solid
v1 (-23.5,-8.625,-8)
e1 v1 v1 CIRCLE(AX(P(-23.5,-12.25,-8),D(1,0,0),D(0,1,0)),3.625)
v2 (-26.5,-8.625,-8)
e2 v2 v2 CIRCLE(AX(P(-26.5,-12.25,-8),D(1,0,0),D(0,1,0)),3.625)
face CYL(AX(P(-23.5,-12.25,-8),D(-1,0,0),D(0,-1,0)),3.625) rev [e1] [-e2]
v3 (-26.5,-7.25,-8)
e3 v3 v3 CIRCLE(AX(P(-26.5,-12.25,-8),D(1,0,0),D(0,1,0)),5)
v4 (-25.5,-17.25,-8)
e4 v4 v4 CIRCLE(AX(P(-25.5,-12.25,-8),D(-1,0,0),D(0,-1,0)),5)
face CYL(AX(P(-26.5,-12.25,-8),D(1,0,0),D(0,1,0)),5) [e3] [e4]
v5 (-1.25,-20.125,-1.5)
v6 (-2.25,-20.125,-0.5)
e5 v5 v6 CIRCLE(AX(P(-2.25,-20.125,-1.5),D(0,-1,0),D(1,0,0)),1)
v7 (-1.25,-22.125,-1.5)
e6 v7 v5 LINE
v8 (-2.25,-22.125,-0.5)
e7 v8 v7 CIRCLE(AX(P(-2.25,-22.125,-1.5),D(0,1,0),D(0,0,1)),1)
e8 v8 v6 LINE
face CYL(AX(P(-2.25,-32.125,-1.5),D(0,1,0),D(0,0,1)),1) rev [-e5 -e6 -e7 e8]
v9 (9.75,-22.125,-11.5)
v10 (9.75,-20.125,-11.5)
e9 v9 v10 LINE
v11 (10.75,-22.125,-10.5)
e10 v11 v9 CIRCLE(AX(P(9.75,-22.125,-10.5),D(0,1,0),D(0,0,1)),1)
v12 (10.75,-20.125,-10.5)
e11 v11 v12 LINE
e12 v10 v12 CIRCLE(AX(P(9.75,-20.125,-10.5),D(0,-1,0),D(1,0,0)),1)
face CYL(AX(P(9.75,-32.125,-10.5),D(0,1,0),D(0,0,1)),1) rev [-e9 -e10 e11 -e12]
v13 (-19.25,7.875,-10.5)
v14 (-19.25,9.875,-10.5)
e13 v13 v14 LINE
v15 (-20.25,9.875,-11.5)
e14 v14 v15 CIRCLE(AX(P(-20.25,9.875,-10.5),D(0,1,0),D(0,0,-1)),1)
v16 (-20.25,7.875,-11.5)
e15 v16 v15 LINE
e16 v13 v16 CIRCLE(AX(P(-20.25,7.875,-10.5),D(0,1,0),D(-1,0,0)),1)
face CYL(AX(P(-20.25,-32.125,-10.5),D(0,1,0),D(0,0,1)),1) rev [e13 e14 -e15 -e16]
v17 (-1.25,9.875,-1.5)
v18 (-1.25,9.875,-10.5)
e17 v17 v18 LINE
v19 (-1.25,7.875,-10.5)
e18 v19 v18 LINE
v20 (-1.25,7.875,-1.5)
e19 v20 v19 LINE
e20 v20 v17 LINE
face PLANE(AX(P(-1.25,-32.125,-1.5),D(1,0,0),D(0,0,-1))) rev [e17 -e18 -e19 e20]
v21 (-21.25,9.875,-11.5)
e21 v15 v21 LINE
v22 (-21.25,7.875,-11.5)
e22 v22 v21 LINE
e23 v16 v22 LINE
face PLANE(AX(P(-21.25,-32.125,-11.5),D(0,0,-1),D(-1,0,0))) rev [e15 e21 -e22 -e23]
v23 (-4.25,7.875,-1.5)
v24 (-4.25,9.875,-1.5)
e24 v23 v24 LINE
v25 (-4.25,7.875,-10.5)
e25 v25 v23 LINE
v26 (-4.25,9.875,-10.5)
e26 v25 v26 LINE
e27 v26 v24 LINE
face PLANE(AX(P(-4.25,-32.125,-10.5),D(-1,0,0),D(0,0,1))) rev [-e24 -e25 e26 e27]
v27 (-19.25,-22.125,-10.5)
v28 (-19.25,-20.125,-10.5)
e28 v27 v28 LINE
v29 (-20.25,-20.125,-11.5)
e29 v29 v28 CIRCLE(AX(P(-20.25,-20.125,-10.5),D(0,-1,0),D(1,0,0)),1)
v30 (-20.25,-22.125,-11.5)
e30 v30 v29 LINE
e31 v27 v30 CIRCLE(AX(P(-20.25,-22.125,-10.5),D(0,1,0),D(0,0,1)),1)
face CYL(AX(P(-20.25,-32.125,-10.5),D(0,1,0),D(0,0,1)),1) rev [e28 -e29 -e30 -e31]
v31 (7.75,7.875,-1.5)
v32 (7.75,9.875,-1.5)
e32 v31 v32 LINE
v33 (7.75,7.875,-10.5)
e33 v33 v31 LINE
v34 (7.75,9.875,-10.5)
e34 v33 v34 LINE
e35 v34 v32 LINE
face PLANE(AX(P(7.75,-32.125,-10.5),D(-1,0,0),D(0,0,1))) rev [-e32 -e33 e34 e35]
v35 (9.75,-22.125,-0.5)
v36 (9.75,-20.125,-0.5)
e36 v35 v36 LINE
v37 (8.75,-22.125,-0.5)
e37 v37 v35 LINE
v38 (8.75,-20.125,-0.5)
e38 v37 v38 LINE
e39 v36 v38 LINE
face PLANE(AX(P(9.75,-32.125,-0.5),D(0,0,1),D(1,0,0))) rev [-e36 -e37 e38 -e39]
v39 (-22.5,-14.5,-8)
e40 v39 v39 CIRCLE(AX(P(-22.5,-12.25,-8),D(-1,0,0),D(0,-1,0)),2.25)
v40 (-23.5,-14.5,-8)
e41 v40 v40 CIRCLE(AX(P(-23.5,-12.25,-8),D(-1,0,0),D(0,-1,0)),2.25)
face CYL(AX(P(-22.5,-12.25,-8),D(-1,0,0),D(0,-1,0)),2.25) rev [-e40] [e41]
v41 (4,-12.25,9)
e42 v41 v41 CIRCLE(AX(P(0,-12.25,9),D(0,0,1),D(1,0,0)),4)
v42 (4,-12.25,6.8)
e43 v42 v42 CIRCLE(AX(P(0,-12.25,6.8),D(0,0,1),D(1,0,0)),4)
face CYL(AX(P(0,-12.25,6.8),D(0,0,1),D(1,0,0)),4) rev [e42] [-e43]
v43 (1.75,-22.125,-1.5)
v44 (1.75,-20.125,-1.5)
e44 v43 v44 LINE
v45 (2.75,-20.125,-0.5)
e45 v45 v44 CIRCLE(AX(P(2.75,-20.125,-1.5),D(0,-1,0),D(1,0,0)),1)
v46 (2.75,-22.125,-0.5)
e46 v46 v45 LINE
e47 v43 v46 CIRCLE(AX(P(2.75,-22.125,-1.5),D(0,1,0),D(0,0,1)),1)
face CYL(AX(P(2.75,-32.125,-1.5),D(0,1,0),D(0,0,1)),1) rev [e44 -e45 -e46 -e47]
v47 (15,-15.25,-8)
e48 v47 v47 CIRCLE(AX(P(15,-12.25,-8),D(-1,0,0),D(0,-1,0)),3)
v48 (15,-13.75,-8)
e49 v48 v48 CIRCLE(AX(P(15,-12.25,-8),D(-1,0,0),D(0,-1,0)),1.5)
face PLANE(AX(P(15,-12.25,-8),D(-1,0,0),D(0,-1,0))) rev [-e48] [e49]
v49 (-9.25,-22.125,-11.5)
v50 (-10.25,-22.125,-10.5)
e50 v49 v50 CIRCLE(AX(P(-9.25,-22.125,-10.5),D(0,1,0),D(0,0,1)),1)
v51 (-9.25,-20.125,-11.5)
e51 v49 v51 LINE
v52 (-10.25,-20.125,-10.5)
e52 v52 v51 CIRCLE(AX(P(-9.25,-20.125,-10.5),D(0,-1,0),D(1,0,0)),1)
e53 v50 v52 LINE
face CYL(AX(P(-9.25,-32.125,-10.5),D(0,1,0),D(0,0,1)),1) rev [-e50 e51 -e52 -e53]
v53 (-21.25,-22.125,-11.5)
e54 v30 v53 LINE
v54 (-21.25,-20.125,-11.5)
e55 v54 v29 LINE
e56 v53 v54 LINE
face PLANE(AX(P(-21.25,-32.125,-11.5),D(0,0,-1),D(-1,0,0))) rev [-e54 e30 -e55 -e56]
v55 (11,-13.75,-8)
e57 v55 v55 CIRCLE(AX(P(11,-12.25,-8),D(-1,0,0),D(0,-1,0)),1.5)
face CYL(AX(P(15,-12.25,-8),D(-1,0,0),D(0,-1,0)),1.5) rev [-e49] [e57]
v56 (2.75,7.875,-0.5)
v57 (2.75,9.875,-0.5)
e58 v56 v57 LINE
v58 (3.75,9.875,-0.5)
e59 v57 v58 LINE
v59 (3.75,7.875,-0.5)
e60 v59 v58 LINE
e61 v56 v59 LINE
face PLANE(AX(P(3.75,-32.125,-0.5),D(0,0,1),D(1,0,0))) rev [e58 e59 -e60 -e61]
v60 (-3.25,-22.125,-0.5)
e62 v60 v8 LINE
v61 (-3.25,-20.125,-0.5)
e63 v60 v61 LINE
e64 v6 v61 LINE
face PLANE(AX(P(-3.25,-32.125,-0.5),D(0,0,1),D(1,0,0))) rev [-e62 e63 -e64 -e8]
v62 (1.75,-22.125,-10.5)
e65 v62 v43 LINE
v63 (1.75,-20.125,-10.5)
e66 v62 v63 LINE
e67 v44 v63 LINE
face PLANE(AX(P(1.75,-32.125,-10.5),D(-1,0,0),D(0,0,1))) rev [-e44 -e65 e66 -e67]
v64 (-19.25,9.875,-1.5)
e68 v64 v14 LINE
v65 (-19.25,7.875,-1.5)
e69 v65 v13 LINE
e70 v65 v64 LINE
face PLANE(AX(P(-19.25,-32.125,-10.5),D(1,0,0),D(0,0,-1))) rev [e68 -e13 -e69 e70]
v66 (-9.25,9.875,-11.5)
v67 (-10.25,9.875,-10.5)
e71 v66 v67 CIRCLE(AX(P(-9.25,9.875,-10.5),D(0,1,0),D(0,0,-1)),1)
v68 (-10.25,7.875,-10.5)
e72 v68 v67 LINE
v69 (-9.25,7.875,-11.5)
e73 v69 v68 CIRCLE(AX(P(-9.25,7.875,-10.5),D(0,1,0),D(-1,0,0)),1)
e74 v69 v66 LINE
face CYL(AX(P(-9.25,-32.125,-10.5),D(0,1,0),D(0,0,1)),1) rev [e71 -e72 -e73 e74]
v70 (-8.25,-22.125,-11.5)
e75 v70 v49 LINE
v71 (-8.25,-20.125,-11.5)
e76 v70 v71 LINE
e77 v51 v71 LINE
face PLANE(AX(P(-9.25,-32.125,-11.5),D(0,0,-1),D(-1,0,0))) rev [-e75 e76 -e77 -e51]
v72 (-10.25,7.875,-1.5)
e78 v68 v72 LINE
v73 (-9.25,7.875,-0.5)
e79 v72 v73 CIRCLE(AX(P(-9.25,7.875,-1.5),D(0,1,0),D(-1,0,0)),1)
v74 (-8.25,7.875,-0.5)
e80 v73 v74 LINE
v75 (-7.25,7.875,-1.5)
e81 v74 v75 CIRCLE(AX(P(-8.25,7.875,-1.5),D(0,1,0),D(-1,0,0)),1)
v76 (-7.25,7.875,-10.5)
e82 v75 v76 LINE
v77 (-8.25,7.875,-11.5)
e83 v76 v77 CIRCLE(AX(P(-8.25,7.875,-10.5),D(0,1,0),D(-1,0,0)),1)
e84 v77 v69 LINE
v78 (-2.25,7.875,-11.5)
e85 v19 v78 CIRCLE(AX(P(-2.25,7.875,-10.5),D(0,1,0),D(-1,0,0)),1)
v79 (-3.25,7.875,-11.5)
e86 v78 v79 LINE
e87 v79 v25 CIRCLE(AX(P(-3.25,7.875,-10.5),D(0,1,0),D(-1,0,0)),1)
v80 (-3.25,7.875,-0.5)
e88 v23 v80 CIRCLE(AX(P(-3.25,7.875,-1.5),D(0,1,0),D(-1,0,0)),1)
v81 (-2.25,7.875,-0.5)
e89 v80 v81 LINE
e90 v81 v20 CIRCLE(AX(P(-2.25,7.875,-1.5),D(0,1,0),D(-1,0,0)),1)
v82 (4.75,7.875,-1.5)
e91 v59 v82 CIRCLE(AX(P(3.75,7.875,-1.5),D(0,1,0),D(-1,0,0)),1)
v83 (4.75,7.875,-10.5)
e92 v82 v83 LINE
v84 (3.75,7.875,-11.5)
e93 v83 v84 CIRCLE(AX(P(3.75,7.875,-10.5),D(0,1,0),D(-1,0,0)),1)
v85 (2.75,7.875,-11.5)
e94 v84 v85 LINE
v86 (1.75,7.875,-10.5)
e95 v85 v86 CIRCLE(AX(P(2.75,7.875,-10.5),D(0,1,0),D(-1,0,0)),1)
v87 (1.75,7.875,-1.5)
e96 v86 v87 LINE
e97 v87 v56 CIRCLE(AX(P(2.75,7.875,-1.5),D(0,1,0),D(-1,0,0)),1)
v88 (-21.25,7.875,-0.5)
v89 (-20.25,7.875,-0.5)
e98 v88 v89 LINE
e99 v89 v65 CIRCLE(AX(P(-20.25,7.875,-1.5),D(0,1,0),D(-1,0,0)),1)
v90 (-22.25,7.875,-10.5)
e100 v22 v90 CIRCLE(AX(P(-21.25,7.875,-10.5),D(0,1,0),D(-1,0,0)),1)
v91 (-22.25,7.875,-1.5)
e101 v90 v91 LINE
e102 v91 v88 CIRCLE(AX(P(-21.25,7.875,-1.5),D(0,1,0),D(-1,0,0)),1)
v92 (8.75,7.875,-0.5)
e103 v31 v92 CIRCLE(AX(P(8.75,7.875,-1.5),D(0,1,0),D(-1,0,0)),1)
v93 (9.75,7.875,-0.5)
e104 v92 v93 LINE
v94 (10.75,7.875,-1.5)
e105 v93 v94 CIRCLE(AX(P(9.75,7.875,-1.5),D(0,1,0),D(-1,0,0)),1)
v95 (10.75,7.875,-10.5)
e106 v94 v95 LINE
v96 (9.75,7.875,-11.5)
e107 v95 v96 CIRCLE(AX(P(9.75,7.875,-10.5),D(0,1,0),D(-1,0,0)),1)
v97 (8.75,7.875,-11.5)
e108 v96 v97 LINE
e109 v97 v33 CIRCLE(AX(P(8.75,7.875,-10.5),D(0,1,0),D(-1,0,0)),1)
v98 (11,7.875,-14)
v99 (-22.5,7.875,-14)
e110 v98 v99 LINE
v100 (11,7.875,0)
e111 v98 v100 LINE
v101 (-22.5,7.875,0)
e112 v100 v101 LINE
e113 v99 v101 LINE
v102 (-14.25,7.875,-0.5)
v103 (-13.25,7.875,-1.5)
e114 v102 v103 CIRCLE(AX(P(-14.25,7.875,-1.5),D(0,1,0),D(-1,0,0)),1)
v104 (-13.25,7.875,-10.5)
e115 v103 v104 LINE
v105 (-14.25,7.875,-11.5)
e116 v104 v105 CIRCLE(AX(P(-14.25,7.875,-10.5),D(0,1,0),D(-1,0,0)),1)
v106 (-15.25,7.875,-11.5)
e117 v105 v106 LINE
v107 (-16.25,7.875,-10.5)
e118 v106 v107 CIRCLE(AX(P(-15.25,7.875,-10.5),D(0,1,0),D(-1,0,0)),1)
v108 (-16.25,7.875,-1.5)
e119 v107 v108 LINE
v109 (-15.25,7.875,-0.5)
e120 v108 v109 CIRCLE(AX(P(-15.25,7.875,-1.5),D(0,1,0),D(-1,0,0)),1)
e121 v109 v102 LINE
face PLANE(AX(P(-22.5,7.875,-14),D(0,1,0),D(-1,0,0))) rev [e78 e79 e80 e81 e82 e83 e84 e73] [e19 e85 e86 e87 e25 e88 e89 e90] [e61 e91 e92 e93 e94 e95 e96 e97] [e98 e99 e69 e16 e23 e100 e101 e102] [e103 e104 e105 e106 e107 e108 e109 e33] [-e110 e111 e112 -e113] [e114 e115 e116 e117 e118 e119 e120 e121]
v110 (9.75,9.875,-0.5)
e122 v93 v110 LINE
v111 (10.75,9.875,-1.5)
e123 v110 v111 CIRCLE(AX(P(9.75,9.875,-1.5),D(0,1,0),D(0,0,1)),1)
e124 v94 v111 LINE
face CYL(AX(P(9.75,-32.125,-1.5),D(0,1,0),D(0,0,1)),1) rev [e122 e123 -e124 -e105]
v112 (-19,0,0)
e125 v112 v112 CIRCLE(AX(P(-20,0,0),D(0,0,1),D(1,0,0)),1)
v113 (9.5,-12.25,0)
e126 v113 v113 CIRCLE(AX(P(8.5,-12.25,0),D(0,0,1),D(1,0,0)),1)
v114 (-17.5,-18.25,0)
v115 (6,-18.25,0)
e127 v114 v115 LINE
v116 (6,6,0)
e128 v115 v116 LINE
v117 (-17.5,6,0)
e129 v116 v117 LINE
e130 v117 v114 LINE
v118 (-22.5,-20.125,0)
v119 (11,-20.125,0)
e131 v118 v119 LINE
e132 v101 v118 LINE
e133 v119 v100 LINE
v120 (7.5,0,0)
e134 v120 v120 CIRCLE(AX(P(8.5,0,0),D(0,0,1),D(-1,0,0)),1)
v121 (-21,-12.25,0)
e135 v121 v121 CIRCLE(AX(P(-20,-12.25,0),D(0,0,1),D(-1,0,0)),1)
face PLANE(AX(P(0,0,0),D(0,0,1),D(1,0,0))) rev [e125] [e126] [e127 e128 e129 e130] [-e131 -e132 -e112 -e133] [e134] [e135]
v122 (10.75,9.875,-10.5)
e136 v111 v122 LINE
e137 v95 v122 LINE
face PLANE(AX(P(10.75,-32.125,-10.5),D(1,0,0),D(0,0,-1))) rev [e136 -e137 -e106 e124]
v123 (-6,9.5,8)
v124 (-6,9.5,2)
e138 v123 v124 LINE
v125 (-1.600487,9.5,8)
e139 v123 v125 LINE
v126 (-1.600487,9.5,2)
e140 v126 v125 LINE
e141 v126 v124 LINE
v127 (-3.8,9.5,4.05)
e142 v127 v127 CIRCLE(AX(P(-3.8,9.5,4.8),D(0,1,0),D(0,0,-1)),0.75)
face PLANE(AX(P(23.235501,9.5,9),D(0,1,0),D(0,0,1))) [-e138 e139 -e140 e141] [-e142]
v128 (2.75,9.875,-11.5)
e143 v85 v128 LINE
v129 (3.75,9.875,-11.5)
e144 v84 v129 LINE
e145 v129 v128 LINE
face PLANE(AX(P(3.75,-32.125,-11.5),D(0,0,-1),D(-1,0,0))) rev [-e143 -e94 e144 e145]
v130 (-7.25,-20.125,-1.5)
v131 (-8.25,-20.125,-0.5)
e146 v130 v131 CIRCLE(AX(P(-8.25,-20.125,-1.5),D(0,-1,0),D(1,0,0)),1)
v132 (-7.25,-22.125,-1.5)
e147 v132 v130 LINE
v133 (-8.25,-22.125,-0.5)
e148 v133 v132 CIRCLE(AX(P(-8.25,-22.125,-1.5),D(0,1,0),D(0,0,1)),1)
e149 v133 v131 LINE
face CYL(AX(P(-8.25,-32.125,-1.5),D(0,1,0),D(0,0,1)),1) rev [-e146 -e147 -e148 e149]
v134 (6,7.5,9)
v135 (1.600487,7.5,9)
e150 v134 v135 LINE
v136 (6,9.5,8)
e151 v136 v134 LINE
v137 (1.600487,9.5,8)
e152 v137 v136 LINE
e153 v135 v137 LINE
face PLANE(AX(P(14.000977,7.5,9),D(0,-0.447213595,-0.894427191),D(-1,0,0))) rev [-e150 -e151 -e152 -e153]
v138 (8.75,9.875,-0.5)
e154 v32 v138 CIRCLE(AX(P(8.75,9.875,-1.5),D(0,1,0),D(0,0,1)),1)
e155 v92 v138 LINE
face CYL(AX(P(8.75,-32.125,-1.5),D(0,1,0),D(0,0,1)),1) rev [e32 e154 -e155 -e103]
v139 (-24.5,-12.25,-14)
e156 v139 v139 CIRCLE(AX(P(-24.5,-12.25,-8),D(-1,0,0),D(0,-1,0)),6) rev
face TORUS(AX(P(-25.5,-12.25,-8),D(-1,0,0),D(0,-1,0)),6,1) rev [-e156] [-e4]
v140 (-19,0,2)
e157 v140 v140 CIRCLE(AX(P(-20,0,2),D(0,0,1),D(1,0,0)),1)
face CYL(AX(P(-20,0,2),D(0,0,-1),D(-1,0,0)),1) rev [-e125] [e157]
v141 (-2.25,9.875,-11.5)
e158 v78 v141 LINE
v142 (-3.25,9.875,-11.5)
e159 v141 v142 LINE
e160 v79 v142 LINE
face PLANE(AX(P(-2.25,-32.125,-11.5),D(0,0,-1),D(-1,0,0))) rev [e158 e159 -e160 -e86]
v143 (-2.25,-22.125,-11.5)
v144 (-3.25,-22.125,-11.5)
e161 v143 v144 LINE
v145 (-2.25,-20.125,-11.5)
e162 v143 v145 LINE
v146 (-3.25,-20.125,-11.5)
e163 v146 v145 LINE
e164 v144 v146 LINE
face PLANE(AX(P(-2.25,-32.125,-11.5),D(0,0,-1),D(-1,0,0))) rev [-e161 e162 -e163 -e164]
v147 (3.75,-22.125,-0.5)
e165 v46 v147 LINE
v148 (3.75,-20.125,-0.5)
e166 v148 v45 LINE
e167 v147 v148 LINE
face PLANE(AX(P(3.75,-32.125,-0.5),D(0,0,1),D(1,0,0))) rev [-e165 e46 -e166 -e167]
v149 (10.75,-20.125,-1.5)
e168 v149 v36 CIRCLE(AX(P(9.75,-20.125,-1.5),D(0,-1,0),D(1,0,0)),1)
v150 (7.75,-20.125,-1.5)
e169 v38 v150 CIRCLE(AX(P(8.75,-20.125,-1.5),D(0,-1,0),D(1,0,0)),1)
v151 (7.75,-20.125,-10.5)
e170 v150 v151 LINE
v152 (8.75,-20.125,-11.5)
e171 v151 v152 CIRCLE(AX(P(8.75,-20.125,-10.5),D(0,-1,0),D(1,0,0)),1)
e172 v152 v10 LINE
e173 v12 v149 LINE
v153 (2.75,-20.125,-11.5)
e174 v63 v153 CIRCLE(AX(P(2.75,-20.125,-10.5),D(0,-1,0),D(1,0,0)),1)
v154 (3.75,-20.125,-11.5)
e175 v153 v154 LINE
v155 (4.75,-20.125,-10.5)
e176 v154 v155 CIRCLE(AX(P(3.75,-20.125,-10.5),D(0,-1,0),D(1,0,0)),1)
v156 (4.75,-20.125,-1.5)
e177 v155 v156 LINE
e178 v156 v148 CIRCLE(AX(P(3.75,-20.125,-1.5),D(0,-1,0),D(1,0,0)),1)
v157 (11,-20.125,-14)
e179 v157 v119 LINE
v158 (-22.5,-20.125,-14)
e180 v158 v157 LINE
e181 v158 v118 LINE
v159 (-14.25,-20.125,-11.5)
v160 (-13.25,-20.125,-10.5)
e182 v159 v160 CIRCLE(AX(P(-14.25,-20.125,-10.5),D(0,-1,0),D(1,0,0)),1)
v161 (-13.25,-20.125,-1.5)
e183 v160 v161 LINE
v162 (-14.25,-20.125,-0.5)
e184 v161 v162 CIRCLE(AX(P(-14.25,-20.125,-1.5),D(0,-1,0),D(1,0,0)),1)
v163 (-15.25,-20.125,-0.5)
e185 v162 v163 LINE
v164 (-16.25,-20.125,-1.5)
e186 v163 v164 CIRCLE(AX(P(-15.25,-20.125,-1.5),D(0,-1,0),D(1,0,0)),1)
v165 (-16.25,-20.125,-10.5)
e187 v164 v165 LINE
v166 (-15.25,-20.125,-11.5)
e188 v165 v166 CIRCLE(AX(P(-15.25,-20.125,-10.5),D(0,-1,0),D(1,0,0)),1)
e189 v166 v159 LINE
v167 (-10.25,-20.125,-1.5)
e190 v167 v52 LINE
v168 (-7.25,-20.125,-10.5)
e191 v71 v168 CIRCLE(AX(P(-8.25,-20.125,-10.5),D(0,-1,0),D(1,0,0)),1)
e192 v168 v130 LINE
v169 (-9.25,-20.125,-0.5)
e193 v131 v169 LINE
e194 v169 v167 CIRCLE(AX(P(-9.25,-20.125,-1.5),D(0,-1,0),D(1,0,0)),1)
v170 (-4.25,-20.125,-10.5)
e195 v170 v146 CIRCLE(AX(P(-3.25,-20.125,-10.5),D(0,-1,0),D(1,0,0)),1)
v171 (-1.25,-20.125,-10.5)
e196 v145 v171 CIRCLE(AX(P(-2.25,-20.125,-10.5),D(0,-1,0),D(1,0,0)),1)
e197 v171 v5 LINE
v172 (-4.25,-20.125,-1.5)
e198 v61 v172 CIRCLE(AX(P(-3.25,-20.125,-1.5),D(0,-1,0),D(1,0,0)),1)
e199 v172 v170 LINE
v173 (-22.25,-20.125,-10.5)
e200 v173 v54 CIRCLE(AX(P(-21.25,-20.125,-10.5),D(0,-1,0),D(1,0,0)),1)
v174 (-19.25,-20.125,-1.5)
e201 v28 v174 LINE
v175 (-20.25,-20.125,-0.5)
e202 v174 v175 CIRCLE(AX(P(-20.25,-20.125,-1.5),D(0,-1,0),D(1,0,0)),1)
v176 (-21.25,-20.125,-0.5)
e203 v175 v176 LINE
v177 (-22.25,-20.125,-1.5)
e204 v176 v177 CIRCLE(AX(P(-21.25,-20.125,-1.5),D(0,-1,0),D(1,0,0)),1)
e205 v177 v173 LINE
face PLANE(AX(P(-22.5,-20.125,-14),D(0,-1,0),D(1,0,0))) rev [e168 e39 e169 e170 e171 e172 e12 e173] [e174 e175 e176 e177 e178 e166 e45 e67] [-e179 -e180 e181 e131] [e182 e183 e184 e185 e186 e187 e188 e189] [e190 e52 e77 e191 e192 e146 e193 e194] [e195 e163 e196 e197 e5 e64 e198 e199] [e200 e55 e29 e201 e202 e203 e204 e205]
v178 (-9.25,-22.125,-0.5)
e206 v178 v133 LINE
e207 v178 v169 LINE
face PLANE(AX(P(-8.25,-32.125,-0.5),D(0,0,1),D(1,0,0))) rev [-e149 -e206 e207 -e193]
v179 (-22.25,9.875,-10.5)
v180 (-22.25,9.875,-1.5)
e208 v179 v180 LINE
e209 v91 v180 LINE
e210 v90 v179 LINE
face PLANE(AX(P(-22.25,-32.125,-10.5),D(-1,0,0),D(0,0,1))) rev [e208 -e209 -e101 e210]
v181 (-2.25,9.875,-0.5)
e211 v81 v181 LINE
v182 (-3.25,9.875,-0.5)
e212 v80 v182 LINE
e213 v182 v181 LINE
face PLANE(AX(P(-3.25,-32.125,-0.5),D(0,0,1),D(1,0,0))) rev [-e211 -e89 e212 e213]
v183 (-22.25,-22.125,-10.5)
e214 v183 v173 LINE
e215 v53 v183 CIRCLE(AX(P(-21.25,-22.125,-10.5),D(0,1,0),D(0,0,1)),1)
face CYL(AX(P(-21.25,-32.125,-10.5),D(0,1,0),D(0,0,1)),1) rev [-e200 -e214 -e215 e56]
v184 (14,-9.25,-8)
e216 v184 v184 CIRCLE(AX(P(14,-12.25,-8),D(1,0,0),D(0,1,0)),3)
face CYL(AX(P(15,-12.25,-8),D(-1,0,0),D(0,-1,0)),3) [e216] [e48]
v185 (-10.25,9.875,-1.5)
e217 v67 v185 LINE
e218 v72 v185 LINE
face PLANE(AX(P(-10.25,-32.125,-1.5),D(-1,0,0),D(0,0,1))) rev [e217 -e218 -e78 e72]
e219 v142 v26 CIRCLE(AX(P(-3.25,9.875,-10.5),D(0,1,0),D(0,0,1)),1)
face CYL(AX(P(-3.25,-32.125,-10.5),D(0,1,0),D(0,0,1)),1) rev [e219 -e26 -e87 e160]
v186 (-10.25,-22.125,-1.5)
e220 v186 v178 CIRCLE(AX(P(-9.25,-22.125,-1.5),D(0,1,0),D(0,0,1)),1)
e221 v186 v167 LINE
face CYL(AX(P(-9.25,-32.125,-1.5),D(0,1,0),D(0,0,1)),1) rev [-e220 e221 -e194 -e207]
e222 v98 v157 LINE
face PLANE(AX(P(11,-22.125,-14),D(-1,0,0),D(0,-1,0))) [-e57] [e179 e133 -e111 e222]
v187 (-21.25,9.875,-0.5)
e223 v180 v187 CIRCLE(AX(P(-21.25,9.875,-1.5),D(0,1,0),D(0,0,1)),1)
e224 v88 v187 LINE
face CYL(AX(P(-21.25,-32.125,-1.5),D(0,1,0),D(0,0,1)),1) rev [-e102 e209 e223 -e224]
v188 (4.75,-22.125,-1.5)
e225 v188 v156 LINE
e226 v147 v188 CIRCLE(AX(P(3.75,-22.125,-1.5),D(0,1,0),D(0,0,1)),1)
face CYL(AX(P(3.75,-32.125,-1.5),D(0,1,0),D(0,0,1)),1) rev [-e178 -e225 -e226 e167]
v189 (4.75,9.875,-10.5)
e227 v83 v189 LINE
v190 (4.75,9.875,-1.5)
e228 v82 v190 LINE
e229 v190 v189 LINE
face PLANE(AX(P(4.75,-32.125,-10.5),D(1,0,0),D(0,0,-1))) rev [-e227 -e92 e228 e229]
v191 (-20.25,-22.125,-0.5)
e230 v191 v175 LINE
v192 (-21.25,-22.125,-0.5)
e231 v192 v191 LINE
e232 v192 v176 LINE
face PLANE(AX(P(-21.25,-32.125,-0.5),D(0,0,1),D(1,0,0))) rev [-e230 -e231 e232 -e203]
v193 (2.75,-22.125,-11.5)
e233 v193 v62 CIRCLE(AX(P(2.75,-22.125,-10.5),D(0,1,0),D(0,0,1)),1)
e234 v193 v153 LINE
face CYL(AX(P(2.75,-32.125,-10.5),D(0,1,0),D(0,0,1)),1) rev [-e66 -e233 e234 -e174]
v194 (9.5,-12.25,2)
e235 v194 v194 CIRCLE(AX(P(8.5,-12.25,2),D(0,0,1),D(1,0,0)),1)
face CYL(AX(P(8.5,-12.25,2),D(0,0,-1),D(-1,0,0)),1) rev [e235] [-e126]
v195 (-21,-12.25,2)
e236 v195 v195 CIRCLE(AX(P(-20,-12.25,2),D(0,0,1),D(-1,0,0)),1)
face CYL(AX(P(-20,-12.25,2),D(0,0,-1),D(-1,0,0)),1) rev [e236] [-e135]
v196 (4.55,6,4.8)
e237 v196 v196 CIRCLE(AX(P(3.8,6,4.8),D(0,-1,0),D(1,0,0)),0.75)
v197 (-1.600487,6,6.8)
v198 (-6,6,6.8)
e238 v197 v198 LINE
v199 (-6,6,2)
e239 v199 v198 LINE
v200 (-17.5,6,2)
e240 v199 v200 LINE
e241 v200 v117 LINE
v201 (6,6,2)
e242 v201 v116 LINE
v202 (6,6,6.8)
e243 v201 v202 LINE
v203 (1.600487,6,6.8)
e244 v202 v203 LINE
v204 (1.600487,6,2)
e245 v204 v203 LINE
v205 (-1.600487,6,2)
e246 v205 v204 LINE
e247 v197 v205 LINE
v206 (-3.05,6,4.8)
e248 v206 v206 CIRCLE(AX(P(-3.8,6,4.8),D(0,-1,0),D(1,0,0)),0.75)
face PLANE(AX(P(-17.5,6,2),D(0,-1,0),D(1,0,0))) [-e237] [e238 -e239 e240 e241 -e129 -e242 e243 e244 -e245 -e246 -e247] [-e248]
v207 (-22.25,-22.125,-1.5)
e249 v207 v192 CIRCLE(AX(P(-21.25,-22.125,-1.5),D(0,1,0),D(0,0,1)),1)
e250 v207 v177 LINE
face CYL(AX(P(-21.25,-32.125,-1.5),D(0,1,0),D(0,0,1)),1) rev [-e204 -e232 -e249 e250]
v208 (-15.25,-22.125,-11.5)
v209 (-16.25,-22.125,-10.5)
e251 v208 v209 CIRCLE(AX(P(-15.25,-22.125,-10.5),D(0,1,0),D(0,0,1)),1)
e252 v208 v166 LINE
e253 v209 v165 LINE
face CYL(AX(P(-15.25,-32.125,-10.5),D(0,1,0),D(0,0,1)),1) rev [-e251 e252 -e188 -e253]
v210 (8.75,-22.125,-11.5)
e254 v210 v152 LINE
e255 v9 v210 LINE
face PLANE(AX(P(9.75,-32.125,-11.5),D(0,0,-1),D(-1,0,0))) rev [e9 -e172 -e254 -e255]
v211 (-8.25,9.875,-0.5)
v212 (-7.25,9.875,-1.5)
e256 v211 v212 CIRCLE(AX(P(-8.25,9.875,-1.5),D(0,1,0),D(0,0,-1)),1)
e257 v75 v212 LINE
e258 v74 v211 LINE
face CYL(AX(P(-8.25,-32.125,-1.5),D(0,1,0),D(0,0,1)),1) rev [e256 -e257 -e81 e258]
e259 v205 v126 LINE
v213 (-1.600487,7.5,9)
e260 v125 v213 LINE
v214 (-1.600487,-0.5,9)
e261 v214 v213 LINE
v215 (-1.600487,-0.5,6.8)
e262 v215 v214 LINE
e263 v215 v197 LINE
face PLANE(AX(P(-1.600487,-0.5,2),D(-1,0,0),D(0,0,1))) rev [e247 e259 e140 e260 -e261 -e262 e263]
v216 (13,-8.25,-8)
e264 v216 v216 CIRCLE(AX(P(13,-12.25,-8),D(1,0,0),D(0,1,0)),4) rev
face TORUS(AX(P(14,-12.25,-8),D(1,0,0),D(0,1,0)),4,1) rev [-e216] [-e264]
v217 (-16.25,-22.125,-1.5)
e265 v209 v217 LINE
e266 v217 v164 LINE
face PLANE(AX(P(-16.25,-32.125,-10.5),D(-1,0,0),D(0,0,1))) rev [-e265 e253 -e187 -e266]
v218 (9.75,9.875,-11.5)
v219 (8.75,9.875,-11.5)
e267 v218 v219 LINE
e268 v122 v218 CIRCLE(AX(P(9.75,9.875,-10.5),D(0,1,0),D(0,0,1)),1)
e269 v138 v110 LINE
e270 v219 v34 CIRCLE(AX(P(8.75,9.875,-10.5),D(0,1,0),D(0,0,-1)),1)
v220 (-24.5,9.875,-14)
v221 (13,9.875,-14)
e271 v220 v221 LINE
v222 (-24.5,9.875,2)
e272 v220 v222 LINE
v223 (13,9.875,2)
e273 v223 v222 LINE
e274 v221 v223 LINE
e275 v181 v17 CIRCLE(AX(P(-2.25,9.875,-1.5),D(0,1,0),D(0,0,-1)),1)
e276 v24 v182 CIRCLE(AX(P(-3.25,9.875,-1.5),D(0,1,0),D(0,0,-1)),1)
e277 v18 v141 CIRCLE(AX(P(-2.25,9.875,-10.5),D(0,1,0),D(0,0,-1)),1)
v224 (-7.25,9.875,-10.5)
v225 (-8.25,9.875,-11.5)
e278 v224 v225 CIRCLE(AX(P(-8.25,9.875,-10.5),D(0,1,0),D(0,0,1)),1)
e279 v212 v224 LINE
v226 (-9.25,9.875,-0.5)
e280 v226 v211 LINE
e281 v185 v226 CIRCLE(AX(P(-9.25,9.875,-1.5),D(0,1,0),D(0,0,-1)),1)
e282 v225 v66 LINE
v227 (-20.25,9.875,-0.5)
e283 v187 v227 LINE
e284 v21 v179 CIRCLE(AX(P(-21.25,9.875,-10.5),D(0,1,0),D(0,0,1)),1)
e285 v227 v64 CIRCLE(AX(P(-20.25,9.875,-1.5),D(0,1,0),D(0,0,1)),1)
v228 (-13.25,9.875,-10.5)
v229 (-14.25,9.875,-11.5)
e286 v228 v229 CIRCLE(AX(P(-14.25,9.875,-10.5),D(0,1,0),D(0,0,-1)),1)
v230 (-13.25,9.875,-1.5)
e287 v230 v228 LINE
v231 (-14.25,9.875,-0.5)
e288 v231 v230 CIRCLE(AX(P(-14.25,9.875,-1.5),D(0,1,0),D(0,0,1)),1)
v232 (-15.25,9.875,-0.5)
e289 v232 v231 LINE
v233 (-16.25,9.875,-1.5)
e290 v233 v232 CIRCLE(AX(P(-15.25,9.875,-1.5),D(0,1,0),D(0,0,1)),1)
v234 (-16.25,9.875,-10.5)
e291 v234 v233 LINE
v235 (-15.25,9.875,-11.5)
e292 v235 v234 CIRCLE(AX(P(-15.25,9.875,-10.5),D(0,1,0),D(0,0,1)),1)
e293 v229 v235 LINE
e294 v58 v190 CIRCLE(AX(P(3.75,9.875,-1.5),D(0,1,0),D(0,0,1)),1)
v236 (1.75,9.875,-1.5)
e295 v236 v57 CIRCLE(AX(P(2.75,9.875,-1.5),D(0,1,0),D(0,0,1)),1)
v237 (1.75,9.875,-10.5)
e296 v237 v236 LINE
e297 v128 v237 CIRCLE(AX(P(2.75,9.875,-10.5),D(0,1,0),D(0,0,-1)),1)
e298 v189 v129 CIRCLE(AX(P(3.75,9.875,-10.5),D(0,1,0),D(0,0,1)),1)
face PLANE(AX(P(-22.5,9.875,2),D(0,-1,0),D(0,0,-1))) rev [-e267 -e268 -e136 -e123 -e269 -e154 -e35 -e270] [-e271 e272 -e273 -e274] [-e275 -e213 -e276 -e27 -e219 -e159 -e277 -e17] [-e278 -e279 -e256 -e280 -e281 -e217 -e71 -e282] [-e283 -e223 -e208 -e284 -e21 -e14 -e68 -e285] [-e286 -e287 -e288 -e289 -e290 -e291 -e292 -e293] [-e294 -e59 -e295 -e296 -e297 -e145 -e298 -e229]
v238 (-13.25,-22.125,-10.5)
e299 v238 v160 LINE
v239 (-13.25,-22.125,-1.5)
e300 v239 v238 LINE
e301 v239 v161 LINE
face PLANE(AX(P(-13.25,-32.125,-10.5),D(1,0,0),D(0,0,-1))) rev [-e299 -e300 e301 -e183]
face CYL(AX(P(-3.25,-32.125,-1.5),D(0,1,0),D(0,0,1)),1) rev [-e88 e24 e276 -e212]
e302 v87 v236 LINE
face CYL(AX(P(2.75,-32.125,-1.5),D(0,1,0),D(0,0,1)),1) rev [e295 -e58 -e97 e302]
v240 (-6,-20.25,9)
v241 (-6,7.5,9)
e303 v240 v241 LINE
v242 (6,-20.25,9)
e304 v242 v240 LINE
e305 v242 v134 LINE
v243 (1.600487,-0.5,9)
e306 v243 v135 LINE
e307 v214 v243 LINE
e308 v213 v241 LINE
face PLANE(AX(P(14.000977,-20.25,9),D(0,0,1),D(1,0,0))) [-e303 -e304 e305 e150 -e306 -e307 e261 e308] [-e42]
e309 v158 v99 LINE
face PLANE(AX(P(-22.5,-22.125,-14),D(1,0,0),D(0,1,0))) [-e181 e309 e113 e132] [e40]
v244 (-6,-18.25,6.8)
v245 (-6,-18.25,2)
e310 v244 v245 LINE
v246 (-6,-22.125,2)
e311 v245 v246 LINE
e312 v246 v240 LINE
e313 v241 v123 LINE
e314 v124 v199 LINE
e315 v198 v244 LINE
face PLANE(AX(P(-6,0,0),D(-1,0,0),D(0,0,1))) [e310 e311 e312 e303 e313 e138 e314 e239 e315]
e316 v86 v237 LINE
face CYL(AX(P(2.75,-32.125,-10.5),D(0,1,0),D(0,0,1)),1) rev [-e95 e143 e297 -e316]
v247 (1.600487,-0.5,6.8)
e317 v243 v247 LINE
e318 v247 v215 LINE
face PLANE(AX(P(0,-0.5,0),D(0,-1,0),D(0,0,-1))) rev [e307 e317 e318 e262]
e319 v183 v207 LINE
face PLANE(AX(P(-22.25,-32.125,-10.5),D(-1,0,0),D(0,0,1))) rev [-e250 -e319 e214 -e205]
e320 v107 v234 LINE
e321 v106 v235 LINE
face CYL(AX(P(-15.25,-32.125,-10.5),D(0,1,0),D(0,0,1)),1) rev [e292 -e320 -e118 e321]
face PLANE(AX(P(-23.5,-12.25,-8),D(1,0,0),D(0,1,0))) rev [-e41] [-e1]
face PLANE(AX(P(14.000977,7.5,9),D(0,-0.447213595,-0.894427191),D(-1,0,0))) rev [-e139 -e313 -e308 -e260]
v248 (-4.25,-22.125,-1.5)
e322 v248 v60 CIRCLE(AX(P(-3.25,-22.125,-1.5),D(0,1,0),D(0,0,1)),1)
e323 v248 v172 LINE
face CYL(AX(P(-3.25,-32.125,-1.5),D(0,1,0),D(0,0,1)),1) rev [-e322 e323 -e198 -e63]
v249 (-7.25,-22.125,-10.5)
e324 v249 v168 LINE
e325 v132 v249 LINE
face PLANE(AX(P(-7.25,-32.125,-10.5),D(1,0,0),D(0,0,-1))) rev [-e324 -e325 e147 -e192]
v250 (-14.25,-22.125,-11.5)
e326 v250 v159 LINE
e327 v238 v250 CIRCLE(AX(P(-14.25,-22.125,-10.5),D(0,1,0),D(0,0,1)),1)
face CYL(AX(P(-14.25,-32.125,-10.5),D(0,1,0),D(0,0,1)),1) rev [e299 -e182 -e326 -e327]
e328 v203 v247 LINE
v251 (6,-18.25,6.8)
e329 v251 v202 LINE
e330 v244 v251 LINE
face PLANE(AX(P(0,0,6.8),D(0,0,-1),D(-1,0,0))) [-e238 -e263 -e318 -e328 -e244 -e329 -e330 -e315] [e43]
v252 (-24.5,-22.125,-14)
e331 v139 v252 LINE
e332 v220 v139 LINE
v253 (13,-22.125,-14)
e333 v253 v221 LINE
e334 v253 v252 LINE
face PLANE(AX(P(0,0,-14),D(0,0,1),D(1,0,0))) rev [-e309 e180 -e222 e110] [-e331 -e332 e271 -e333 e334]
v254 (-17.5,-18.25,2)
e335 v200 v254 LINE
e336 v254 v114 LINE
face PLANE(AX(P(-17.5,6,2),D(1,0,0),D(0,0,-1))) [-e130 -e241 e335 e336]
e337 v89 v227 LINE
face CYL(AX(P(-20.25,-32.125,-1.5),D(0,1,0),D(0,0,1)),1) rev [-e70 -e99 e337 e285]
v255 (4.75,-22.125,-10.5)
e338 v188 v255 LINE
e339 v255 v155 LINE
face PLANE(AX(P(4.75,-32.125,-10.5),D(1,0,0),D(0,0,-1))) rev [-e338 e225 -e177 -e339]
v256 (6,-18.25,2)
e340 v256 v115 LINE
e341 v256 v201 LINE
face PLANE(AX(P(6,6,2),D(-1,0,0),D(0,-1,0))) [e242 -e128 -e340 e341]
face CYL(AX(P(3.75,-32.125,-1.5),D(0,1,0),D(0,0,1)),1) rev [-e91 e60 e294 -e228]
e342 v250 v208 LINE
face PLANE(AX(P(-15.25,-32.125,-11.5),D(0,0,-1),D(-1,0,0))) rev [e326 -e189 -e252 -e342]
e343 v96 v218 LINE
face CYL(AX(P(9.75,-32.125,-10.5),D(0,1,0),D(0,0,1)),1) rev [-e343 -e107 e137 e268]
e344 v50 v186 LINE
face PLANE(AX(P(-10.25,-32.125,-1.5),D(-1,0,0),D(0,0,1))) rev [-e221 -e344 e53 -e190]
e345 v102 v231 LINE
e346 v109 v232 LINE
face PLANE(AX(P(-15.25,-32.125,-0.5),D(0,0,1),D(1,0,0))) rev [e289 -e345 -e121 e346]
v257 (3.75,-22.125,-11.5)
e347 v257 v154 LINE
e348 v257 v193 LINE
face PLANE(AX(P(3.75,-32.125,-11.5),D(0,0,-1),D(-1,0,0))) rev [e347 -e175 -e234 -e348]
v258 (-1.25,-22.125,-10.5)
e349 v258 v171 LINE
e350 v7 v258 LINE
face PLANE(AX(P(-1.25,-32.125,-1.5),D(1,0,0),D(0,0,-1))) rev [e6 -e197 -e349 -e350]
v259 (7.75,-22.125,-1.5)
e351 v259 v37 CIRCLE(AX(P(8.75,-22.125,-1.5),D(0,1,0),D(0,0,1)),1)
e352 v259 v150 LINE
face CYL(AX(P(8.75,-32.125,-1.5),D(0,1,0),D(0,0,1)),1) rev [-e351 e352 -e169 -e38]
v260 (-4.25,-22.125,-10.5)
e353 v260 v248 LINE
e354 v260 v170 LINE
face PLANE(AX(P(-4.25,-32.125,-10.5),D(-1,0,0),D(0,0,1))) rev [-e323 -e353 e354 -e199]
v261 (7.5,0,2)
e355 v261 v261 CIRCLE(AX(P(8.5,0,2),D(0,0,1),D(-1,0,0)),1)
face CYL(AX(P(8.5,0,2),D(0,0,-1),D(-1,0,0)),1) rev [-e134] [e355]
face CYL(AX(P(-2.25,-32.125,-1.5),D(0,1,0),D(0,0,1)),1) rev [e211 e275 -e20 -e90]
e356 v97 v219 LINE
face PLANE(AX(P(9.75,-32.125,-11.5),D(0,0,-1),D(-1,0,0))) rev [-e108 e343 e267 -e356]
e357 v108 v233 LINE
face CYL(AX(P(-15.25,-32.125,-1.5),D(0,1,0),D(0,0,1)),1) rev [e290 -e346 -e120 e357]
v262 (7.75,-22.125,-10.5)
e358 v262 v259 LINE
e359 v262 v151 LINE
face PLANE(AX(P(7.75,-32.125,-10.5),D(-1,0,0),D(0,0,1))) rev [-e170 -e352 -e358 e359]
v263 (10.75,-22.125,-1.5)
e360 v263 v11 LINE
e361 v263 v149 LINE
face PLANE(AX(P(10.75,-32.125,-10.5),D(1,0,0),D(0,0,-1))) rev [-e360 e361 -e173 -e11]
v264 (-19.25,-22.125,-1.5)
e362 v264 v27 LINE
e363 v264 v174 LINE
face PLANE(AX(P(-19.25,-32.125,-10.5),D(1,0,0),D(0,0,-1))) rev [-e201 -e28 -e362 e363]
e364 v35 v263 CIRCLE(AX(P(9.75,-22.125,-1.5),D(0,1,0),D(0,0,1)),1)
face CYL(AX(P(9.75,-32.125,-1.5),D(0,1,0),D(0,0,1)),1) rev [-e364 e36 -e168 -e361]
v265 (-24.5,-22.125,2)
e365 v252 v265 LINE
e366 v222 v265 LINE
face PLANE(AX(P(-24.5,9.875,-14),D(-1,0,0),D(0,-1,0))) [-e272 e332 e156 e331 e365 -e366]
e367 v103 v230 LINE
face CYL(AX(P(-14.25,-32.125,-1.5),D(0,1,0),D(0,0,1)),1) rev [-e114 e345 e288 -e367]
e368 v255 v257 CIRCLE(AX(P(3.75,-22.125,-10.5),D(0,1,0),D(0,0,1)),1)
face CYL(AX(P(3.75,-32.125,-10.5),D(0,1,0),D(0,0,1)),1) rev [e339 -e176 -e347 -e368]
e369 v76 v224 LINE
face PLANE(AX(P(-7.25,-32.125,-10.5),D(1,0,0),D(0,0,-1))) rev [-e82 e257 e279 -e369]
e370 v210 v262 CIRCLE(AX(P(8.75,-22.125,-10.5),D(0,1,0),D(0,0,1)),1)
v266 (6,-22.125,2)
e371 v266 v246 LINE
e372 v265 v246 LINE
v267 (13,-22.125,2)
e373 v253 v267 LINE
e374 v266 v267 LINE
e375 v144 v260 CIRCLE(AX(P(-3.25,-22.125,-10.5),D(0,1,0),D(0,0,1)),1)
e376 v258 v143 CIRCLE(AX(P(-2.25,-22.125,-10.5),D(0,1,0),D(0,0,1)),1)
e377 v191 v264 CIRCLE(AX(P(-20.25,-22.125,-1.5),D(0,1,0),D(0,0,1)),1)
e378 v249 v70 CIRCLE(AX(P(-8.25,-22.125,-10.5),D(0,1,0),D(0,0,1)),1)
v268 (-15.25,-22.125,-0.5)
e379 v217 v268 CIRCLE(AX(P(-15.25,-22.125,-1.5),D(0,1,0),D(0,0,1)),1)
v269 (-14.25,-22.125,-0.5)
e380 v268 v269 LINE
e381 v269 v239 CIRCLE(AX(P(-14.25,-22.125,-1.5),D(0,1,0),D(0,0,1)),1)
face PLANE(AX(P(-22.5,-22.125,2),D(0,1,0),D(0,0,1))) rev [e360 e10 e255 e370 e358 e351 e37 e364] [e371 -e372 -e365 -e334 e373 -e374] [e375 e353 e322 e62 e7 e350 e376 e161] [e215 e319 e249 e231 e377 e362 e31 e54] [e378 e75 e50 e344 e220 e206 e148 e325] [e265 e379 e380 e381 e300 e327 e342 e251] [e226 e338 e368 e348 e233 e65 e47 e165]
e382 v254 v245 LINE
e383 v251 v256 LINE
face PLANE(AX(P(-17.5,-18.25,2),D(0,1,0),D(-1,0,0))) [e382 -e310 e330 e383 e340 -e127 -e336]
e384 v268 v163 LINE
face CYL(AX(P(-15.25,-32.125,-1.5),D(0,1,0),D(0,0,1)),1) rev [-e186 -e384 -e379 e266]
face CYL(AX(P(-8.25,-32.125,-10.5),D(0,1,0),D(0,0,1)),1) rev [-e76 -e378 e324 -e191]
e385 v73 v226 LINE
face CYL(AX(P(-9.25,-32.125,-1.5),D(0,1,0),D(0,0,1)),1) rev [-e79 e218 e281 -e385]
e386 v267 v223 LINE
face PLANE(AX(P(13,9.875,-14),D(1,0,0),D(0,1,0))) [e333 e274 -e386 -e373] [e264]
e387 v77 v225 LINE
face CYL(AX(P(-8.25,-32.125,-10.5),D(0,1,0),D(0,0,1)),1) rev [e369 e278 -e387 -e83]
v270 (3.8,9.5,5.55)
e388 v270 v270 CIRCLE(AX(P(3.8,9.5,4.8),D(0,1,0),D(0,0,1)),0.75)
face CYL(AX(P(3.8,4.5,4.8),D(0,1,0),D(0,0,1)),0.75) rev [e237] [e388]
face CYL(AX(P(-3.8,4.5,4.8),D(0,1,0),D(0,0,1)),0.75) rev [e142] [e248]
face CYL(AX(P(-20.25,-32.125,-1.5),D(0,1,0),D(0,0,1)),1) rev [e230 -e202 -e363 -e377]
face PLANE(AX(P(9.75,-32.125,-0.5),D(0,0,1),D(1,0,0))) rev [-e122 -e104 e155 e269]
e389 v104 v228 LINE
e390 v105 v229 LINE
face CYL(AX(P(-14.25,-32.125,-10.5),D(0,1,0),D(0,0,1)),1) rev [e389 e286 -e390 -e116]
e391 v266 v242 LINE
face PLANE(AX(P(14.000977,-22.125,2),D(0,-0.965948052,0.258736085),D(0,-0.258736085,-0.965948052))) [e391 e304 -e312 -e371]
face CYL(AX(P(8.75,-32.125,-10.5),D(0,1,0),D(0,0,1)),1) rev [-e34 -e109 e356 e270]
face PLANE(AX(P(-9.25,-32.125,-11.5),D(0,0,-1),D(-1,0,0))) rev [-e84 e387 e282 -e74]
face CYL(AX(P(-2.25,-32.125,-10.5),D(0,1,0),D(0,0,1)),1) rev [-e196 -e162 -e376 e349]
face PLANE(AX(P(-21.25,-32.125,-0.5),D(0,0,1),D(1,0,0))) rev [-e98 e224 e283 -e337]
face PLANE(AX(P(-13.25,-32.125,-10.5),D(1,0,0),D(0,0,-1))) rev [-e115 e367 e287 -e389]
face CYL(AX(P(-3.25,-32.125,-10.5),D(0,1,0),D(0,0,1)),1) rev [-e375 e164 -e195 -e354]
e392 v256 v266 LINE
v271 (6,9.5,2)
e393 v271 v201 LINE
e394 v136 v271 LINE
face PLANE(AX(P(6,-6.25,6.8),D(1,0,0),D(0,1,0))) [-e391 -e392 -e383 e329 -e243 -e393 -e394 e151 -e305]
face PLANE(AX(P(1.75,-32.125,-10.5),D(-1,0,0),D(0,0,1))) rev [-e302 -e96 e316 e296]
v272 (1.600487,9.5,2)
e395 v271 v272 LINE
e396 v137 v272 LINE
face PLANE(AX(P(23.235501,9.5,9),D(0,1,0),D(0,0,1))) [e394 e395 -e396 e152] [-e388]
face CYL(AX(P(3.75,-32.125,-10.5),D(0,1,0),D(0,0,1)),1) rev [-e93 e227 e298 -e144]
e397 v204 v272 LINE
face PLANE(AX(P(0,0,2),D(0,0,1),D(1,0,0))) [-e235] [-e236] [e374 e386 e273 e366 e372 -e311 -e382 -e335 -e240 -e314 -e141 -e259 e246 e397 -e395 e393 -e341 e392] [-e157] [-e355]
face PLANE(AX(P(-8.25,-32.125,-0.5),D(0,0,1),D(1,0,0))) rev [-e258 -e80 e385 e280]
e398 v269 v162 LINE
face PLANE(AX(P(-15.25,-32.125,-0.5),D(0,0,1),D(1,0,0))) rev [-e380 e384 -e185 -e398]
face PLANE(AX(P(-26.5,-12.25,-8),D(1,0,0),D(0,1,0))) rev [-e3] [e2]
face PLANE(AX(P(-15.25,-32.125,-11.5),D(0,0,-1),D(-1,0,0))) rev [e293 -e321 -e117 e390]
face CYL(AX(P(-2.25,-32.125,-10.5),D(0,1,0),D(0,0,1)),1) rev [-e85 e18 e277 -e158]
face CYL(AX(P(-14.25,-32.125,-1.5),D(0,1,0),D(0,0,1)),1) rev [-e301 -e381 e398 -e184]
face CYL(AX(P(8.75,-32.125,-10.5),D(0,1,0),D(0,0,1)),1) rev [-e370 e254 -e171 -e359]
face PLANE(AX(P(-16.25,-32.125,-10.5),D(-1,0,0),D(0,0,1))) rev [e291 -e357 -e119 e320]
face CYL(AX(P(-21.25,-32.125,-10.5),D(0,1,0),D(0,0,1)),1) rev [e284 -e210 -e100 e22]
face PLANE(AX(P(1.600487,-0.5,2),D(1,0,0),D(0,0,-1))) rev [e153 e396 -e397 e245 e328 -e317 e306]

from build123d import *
from OCP.BRepFilletAPI import BRepFilletAPI_MakeChamfer

# Parameters (mm, degrees)
SKETCH_1_W          = 33.5
SKETCH_1_H          = 32
SKETCH_1_R          = 1
SKETCH_1_W_2        = 23.5
SKETCH_1_H_2        = 24.25
EXTRUDE_1_DEPTH     = 2
SKETCH_2_W          = 12
SKETCH_2_H          = 12
SKETCH_2_R          = 4
EXTRUDE_2_DEPTH     = 2.2
EXTRUDE_3_DEPTH     = 12
EXTRUDE_4_DEPTH     = 12
SKETCH_5_W          = 33.5
SKETCH_5_H          = 2
EXTRUDE_5_DEPTH     = 14
SKETCH_7_W          = 2
SKETCH_7_H          = 32
EXTRUDE_6_DEPTH     = 16
SKETCH_9_R          = 3.625
CUT_EXTRUDE_1_DEPTH = 1
SKETCH_10_R         = 2.25
CUT_EXTRUDE_2_DEPTH = 1
EXTRUDE_START       = -2
SKETCH_11_R         = 5
SKETCH_11_R_2       = 3.625
EXTRUDE_7_DEPTH     = 2
FILLET_1_R          = 1
SKETCH_12_R         = 3
SKETCH_12_R_2       = 1.5
EXTRUDE_8_DEPTH     = 2
FILLET_2_R          = 1
CUT_EXTRUDE_START   = 2
SKETCH_13_R         = 1.5
CUT_EXTRUDE_3_DEPTH = 2
SKETCH_19_W         = 3.200973594
SKETCH_19_H         = 7
CUT_EXTRUDE_7_DEPTH = 10
CUT_EXTRUDE_8_DEPTH = 42
SKETCH_22_R         = 0.75
CUT_EXTRUDE_9_DEPTH = 5
CHAMFER_1_SIZE      = 1
CHAMFER_1_SIZE2     = 2


with BuildPart() as part:
    # 草图1 → 凸台-拉伸1 (new body)
    with BuildSketch(Plane.XY):
        with Locations((-5.75, -6.125)):
            Rectangle(SKETCH_1_W, SKETCH_1_H)
        with Locations((-20, 0)):
            Circle(SKETCH_1_R, mode=Mode.SUBTRACT)
        with Locations(Location((8.5, 0, 0), (0, 0, 180))):
            Circle(SKETCH_1_R, mode=Mode.SUBTRACT)
        with Locations(Location((-20, -12.25, 0), (0, 0, 180))):
            Circle(SKETCH_1_R, mode=Mode.SUBTRACT)
        with Locations((8.5, -12.25)):
            Circle(SKETCH_1_R, mode=Mode.SUBTRACT)
        with Locations((-5.75, -6.125)):
            Rectangle(SKETCH_1_W_2, SKETCH_1_H_2, mode=Mode.SUBTRACT)
    extrude(amount=EXTRUDE_1_DEPTH)



with BuildPart() as body_2:
    # 草图2 → 凸台-拉伸2 (new body)
    with BuildSketch(Plane.XY.offset(9)):
        with Locations((0, -12.25)):
            Rectangle(SKETCH_2_W, SKETCH_2_H)
        with Locations((0, -12.25)):
            Circle(SKETCH_2_R, mode=Mode.SUBTRACT)
    extrude(amount=-EXTRUDE_2_DEPTH)


with BuildPart() as part_1:
    add(part.part)

    add(body_2.part)  # 凸台-拉伸3 merges body 2
    # 草图3 → 凸台-拉伸3 (add)
    with BuildSketch(Plane.ZY.offset(6)):
        Polygon((9, -18.25), (2, -18.25), (2, -22.125), (9, -20.25), align=None)
    extrude(amount=-EXTRUDE_3_DEPTH)

    # 草图4 → 凸台-拉伸4 (add)
    with BuildSketch(Plane.ZY.offset(6)):
        Polygon((6.8, -6.25), (9, -6.25), (9, 9.5), (2, 9.5), (2, 6), (6.8, 6), align=None)
    extrude(amount=-EXTRUDE_4_DEPTH)

    # 草图5 → 凸台-拉伸5 (add)
    with BuildSketch(Plane(origin=(0, 0, 0), x_dir=(-1, 0, 0), z_dir=(0, 0, -1))):
        with Locations((5.75, 8.875)):
            Rectangle(SKETCH_5_W, SKETCH_5_H)
        with Locations((5.75, -21.125)):
            Rectangle(SKETCH_5_W, SKETCH_5_H)
    extrude(amount=EXTRUDE_5_DEPTH)

    # 草图7 → 凸台-拉伸6 (add)
    with BuildSketch(Plane.XY.offset(2)):
        with Locations((-23.5, -6.125)):
            Rectangle(SKETCH_7_W, SKETCH_7_H)
        with Locations((12, -6.125)):
            Rectangle(SKETCH_7_W, SKETCH_7_H)
    extrude(amount=-EXTRUDE_6_DEPTH)

    # 草图9 → 切除-拉伸1 (cut)
    with BuildSketch(Plane(origin=(-24.5, 0, 0), x_dir=(0, 0, -1), z_dir=(1, 0, 0))):
        with Locations(Location((8, -12.25, 0), (0, 0, 90))):
            Circle(SKETCH_9_R)
    extrude(amount=CUT_EXTRUDE_1_DEPTH, mode=Mode.SUBTRACT)

    # 草图10 → 切除-拉伸2 (cut)
    with BuildSketch(Plane.ZY.offset(23.5)):
        with Locations(Location((-8, -12.25, 0), (0, 0, 270))):
            Circle(SKETCH_10_R)
    extrude(amount=-CUT_EXTRUDE_2_DEPTH, mode=Mode.SUBTRACT)

    # 草图11 → 凸台-拉伸7 (add)
    with BuildSketch(Plane(origin=(-24.5, 0, 0), x_dir=(0, 0, -1), z_dir=(1, 0, 0)).offset(EXTRUDE_START)):
        with Locations(Location((8, -12.25, 0), (0, 0, 90))):
            Circle(SKETCH_11_R)
        with Locations(Location((8, -12.25, 0), (0, 0, 90))):
            Circle(SKETCH_11_R_2, mode=Mode.SUBTRACT)
    extrude(amount=EXTRUDE_7_DEPTH)

    # 圆角1
    fillet_1_edges = [part_1.edges().sort_by_distance(p)[0] for p in [
        (-24.5, -17.25, -8),
    ]]
    fillet(fillet_1_edges, radius=FILLET_1_R - 0.0001)  # a hair under: the kernel refuses the full size

    # 草图12 → 凸台-拉伸8 (add)
    with BuildSketch(Plane.ZY.offset(-13)):
        with Locations(Location((-8, -12.25, 0), (0, 0, 270))):
            Circle(SKETCH_12_R)
        with Locations(Location((-8, -12.25, 0), (0, 0, 270))):
            Circle(SKETCH_12_R_2, mode=Mode.SUBTRACT)
    extrude(amount=-EXTRUDE_8_DEPTH)

    # 圆角2
    fillet_2_edges = [part_1.edges().sort_by_distance(p)[0] for p in [
        (13, -9.25, -8),
    ]]
    fillet(fillet_2_edges, radius=FILLET_2_R)

    # 草图13 → 切除-拉伸3 (cut)
    with BuildSketch(Plane.ZY.offset(-13).offset(CUT_EXTRUDE_START)):
        with Locations(Location((-8, -12.25, 0), (0, 0, 270))):
            Circle(SKETCH_13_R)
    extrude(amount=-CUT_EXTRUDE_3_DEPTH, mode=Mode.SUBTRACT)

    # 草图19 → 切除-拉伸7 (cut)
    with BuildSketch(Plane(origin=(0, 9.5, 0), x_dir=(1, 0, 0), z_dir=(0, 1, 0))):
        with Locations((0, -5.5)):
            Rectangle(SKETCH_19_W, SKETCH_19_H)
    extrude(amount=-CUT_EXTRUDE_7_DEPTH, mode=Mode.SUBTRACT)

    # 草图20 → 切除-拉伸8 (cut)
    with BuildSketch(Plane(origin=(0, 9.875, 0), x_dir=(1, 0, 0), z_dir=(0, 1, 0))):
        with BuildLine():
            Line((-7.25, 10.5), (-7.25, 1.5))
            ThreePointArc((-7.25, 1.5), (-7.542893219, 0.792893219), (-8.25, 0.5))
            Line((-8.25, 0.5), (-9.25, 0.5))
            ThreePointArc((-9.25, 0.5), (-9.957106781, 0.792893219), (-10.25, 1.5))
            Line((-10.25, 1.5), (-10.25, 10.5))
            ThreePointArc((-10.25, 10.5), (-9.957106781, 11.207106781), (-9.25, 11.5))
            Line((-9.25, 11.5), (-8.25, 11.5))
            ThreePointArc((-8.25, 11.5), (-7.542893219, 11.207106781), (-7.25, 10.5))
        make_face()
        with BuildLine():
            Line((7.75, 10.5), (7.75, 1.5))
            ThreePointArc((7.75, 1.5), (8.042893219, 0.792893219), (8.75, 0.5))
            Line((8.75, 0.5), (9.75, 0.5))
            ThreePointArc((9.75, 0.5), (10.457106781, 0.792893219), (10.75, 1.5))
            Line((10.75, 1.5), (10.75, 10.5))
            ThreePointArc((10.75, 10.5), (10.457106781, 11.207106781), (9.75, 11.5))
            Line((9.75, 11.5), (8.75, 11.5))
            ThreePointArc((8.75, 11.5), (8.042893219, 11.207106781), (7.75, 10.5))
        make_face()
        with BuildLine():
            Line((-15.25, 11.5), (-14.25, 11.5))
            ThreePointArc((-14.25, 11.5), (-13.542893219, 11.207106781), (-13.25, 10.5))
            Line((-13.25, 10.5), (-13.25, 1.5))
            ThreePointArc((-13.25, 1.5), (-13.542893219, 0.792893219), (-14.25, 0.5))
            Line((-14.25, 0.5), (-15.25, 0.5))
            ThreePointArc((-15.25, 0.5), (-15.957106781, 0.792893219), (-16.25, 1.5))
            Line((-16.25, 1.5), (-16.25, 10.5))
            ThreePointArc((-16.25, 10.5), (-15.957106781, 11.207106781), (-15.25, 11.5))
        make_face()
        with BuildLine():
            Line((-21.25, 11.5), (-20.25, 11.5))
            ThreePointArc((-20.25, 11.5), (-19.542893219, 11.207106781), (-19.25, 10.5))
            Line((-19.25, 10.5), (-19.25, 1.5))
            ThreePointArc((-19.25, 1.5), (-19.542893219, 0.792893219), (-20.25, 0.5))
            Line((-20.25, 0.5), (-21.25, 0.5))
            ThreePointArc((-21.25, 0.5), (-21.957106781, 0.792893219), (-22.25, 1.5))
            Line((-22.25, 1.5), (-22.25, 10.5))
            ThreePointArc((-22.25, 10.5), (-21.957106781, 11.207106781), (-21.25, 11.5))
        make_face()
        with BuildLine():
            Line((1.75, 10.5), (1.75, 1.5))
            ThreePointArc((1.75, 1.5), (2.042893219, 0.792893219), (2.75, 0.5))
            Line((2.75, 0.5), (3.75, 0.5))
            ThreePointArc((3.75, 0.5), (4.457106781, 0.792893219), (4.75, 1.5))
            Line((4.75, 1.5), (4.75, 10.5))
            ThreePointArc((4.75, 10.5), (4.457106781, 11.207106781), (3.75, 11.5))
            Line((3.75, 11.5), (2.75, 11.5))
            ThreePointArc((2.75, 11.5), (2.042893219, 11.207106781), (1.75, 10.5))
        make_face()
        with BuildLine():
            Line((-2.25, 11.5), (-3.25, 11.5))
            ThreePointArc((-3.25, 11.5), (-3.957106781, 11.207106781), (-4.25, 10.5))
            Line((-4.25, 10.5), (-4.25, 1.5))
            ThreePointArc((-4.25, 1.5), (-3.957106781, 0.792893219), (-3.25, 0.5))
            Line((-3.25, 0.5), (-2.25, 0.5))
            ThreePointArc((-2.25, 0.5), (-1.542893219, 0.792893219), (-1.25, 1.5))
            Line((-1.25, 1.5), (-1.25, 10.5))
            ThreePointArc((-1.25, 10.5), (-1.542893219, 11.207106781), (-2.25, 11.5))
        make_face()
    extrude(amount=-CUT_EXTRUDE_8_DEPTH, mode=Mode.SUBTRACT)

    # 草图22 → 切除-拉伸9 (cut)
    with BuildSketch(Plane(origin=(0, 9.5, 0), x_dir=(1, 0, 0), z_dir=(0, 1, 0))):
        with Locations(Location((3.8, -4.8, 0), (0, 0, 270))):
            Circle(SKETCH_22_R)
        with Locations((-3.8, -4.8)):
            Circle(SKETCH_22_R)
    extrude(amount=-CUT_EXTRUDE_9_DEPTH, mode=Mode.SUBTRACT)

    # 倒角1: one chamfer whose edges measure the first distance from different faces: ONE call of the kernel's chamfer builder (chamfer() names one face for all edges)
    chamfer_1_edges_1 = [part_1.edges().sort_by_distance(p)[0] for p in [
        (-3.800243398, 9.5, 9),
    ]]
    chamfer_1_side_1 = [part_1.faces().sort_by_distance(p)[0] for p in [
        (-5.917322484, 9.5, 5.5),
    ]]
    chamfer_1_edges_2 = [part_1.edges().sort_by_distance(p)[0] for p in [
        (3.800243398, 9.5, 9),
    ]]
    chamfer_1_side_2 = [part_1.faces().sort_by_distance(p)[0] for p in [
        (1.683164313, 9.5, 5.5),
    ]]
    chamfer_1 = BRepFilletAPI_MakeChamfer(part_1.part.solid().wrapped)
    for e in chamfer_1_edges_1:
        chamfer_1.Add(CHAMFER_1_SIZE, CHAMFER_1_SIZE2, e.wrapped, chamfer_1_side_1[0].wrapped)  # the first distance lies on this face
    for e in chamfer_1_edges_2:
        chamfer_1.Add(CHAMFER_1_SIZE, CHAMFER_1_SIZE2, e.wrapped, chamfer_1_side_2[0].wrapped)  # the first distance lies on this face
    add(Compound.cast(chamfer_1.Shape()), mode=Mode.REPLACE)


solid = part_1.part
